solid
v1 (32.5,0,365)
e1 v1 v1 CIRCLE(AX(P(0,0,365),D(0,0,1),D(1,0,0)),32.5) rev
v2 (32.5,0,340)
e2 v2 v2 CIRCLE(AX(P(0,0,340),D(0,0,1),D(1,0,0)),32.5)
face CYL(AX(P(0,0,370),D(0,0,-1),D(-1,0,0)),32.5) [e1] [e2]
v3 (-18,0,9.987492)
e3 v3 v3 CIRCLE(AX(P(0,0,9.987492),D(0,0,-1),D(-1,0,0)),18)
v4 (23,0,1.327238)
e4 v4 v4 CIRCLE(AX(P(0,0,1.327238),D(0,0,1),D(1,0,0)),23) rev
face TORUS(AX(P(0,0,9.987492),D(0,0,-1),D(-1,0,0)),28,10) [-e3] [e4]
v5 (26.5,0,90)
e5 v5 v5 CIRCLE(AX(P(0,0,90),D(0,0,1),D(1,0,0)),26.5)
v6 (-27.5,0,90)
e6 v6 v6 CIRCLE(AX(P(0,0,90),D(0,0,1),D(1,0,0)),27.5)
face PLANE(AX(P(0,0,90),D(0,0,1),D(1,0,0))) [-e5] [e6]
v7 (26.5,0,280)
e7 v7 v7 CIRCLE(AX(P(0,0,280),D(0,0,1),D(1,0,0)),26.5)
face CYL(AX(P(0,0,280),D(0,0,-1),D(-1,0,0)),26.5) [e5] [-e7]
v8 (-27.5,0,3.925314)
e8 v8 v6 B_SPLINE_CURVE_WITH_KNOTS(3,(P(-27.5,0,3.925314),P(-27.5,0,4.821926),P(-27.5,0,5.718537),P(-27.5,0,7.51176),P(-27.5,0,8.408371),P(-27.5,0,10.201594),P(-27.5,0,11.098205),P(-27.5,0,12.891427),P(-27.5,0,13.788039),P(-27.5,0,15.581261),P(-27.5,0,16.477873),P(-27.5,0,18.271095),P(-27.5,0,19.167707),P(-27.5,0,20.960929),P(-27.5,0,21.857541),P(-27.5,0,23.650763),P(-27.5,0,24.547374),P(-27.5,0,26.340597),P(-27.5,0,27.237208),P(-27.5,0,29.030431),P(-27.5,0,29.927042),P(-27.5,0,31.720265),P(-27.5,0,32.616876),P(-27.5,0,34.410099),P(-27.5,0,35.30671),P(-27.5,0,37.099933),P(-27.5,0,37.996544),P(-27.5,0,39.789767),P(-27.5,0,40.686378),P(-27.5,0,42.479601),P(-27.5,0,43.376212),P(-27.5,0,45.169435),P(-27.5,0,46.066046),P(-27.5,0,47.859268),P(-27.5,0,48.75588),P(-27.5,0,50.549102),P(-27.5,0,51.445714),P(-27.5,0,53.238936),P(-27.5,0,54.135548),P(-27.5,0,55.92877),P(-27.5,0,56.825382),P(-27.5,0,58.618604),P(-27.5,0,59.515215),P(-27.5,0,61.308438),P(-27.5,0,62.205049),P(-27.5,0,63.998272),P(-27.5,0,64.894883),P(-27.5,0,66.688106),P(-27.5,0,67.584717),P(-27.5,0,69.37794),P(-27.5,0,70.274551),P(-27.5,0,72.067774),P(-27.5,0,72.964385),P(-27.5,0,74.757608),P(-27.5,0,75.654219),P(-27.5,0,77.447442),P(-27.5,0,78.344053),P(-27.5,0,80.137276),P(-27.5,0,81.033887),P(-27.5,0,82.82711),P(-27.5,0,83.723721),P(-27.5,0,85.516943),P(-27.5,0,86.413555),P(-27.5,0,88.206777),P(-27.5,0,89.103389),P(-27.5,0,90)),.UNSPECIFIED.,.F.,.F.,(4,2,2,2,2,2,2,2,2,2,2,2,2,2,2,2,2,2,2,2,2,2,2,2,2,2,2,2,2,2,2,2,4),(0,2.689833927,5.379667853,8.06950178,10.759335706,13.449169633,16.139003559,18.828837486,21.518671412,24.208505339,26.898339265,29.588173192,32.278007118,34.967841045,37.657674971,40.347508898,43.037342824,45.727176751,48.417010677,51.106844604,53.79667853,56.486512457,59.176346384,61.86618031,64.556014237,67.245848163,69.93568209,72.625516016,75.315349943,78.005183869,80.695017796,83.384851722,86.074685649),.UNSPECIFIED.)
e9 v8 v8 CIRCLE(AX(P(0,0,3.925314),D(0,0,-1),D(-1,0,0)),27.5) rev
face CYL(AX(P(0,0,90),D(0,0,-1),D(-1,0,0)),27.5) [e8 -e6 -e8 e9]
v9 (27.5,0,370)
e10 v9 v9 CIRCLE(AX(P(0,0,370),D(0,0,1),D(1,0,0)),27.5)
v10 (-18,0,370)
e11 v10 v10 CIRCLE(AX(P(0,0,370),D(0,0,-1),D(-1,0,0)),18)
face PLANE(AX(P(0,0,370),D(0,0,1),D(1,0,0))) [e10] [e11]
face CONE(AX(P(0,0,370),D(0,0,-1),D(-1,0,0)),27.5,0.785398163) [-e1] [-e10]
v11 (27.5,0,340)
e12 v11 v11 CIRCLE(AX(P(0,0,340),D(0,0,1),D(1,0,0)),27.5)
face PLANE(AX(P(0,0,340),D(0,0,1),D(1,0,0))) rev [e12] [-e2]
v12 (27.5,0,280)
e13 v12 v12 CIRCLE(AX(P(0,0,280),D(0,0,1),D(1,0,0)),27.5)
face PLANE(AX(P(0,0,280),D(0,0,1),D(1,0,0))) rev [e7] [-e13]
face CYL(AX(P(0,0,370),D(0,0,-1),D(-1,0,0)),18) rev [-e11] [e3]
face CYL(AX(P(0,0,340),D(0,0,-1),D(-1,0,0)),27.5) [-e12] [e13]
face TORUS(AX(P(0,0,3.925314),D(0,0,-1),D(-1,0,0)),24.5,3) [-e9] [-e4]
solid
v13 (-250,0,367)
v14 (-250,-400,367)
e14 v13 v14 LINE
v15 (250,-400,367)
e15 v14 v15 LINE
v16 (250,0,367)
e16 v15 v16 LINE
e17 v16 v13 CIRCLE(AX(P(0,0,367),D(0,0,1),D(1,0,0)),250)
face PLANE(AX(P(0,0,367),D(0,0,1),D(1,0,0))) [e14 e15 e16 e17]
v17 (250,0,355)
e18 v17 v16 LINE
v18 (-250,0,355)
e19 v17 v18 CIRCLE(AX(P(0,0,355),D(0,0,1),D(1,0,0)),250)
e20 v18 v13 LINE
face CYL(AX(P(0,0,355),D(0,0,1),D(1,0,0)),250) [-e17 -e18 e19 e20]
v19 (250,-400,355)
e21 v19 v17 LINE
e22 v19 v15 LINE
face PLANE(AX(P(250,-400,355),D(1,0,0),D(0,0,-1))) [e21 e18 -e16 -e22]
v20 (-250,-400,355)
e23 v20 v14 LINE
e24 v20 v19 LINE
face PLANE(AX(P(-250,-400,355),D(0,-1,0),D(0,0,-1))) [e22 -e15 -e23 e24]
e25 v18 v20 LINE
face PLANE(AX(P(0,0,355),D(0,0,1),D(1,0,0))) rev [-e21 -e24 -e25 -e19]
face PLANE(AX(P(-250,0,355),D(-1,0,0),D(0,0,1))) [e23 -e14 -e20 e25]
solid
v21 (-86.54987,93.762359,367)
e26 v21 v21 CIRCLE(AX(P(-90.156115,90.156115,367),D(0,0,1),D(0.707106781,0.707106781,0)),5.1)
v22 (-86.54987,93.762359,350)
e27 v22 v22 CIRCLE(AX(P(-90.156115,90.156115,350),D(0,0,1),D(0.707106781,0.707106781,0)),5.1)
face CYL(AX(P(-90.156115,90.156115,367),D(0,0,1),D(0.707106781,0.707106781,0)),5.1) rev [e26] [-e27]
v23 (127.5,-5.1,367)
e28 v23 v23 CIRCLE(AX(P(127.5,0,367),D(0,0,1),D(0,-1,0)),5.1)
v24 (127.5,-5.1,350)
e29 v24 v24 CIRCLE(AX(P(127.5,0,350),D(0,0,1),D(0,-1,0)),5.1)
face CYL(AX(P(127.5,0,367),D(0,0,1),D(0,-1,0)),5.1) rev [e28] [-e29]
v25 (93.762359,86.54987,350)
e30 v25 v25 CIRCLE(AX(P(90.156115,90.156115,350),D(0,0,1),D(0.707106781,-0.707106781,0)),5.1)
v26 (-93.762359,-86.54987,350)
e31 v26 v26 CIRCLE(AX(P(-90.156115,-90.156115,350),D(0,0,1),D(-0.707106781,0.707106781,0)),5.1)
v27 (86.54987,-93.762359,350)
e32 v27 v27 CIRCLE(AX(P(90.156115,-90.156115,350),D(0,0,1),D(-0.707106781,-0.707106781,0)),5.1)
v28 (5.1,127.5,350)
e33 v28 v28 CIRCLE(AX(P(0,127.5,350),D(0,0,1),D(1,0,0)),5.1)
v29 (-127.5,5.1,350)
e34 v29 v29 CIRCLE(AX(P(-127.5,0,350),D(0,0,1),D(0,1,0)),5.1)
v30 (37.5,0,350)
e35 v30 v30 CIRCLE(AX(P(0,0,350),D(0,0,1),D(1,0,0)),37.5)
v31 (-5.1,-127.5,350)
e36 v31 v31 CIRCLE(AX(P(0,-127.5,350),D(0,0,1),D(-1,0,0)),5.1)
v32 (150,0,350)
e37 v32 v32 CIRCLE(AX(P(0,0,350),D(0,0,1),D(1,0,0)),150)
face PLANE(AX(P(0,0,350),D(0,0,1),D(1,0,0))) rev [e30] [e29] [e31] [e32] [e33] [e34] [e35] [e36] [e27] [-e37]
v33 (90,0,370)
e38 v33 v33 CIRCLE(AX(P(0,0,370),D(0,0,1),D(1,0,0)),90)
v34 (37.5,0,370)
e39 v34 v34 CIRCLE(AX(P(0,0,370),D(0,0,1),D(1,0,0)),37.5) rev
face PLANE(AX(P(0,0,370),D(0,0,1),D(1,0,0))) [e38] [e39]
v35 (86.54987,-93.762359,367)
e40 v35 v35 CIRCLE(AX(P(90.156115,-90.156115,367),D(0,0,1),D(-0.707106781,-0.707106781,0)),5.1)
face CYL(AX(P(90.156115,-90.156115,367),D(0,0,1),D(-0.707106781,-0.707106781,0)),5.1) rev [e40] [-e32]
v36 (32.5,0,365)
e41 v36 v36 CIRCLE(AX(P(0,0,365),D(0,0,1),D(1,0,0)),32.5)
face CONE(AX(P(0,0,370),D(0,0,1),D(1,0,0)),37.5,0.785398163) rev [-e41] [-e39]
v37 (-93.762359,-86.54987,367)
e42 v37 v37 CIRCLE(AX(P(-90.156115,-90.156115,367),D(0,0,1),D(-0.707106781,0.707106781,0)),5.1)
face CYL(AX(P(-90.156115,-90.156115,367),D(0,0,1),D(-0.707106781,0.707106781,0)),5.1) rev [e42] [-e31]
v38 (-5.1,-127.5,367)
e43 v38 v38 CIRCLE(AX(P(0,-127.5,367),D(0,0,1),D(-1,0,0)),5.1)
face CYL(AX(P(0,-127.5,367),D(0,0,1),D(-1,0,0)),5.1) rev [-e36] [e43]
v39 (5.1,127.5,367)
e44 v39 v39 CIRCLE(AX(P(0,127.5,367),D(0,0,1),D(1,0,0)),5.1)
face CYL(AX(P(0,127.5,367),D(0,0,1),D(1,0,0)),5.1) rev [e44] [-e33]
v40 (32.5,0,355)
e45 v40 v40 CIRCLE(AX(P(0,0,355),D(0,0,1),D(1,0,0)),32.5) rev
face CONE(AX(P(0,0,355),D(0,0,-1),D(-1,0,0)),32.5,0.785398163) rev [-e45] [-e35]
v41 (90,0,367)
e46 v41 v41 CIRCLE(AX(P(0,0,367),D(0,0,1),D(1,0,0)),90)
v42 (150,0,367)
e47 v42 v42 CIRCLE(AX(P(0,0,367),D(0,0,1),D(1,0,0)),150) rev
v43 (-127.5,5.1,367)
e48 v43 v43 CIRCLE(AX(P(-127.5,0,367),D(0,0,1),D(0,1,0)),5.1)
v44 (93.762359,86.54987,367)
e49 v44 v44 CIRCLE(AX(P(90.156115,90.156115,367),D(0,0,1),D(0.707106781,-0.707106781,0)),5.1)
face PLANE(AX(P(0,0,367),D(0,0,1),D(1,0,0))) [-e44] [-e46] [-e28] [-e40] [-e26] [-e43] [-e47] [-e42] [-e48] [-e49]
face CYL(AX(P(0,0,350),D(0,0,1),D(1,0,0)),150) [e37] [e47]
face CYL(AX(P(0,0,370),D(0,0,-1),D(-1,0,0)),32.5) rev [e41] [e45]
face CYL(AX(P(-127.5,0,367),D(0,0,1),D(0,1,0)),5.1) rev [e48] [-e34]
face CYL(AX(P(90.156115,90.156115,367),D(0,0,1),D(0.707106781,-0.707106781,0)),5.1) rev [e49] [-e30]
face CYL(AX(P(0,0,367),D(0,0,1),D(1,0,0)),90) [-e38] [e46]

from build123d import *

# Parameters (mm, degrees)
SKETCH_1_R               = 27.5
EXTRUDE_1_DEPTH          = 90
SKETCH_2_R               = 26.5
EXTRUDE_2_DEPTH          = 190
SKETCH_3_R               = 27.5
EXTRUDE_3_DEPTH          = 60
SKETCH_4_R               = 32.5
EXTRUDE_4_DEPTH          = 30
SKETCH_5_R               = 150.00000000000003
EXTRUDE_5_DEPTH          = 20
SKETCH_6_R               = 32.5
CUT_EXTRUDE_1_DEPTH      = 20
CHAMFER_4_SIZE           = 5
SKETCH_8_OUTSIDE_W       = 414.588
SKETCH_8_OUTSIDE_H       = 414.588
SKETCH_8_OUTSIDE_R       = 90
CUT_EXTRUDE_2_DEPTH      = 3
CHAMFER_5_SIZE           = 5
CHAMFER_6_SIZE           = 5
SKETCH_12_R              = 3.000000000000001
CUT_EXTRUDE_4_DEPTH      = 410.2676385936225
PATTERN_CIRCULAR_1_COUNT = 8
SKETCH_13_R              = 18
CUT_EXTRUDE_5_DEPTH      = 427.49736224272243
FILLET_1_R               = 10
FILLET_2_R               = 3
PATTERN_CIRCULAR_2_COUNT = 8
EXTRUDE_6_DEPTH          = 12


with BuildPart() as part:
    # 草图1 → 凸台-拉伸1 (new body)
    with BuildSketch(Plane.XY):
        with Locations(Location((0, 0, 0), (0, 0, 180))):
            Circle(SKETCH_1_R)
    extrude(amount=EXTRUDE_1_DEPTH)

    # 草图2 → 凸台-拉伸2 (add)
    with BuildSketch(Plane.XY.offset(90)):
        Circle(SKETCH_2_R)
    extrude(amount=EXTRUDE_2_DEPTH)

    # 草图3 → 凸台-拉伸3 (add)
    with BuildSketch(Plane.XY.offset(280)):
        with Locations(Location((0, 0, 0), (0, 0, 180))):
            Circle(SKETCH_3_R)
    extrude(amount=EXTRUDE_3_DEPTH)

    # 草图4 → 凸台-拉伸4 (add)
    with BuildSketch(Plane.XY.offset(340)):
        Circle(SKETCH_4_R)
    extrude(amount=EXTRUDE_4_DEPTH)

    # 倒角5
    chamfer_5_edges = [part.edges().sort_by_distance(p)[0] for p in [
        (-32.5, 3.98e-15, 370),
    ]]
    chamfer(chamfer_5_edges, length=CHAMFER_5_SIZE)

    # 草图9 → M12 螺纹孔1 (revolve, cut)
    with BuildSketch(Plane.YZ):
        Polygon((0, 0), (-7.91e-15, 32.31438915704056), (5.099999999999992, 29.25), (5.099999999999995, -2.3e-16), align=None)
    revolve(axis=Axis((0, 0, -6.349999999999991), (0, 0, 1)), mode=Mode.SUBTRACT)

    # 草图13 → 切除-拉伸5 (cut, through all)
    with BuildSketch(Plane(origin=(0, 0, 0), x_dir=(-1, 0, 0), z_dir=(0, 0, -1))):
        Circle(SKETCH_13_R)
    extrude(amount=-CUT_EXTRUDE_5_DEPTH, mode=Mode.SUBTRACT)

    # 圆角1
    # the kernel refuses this fillet: 10 mm, written as the material it takes off along each edge
    with BuildSketch(Plane(origin=(0, 0, 0), x_dir=(-1, 0, 0), z_dir=(0, -1, 0))) as fillet_1_piece_1:
        with BuildLine():
            CenterArc((28, -9.987492177719089), FILLET_1_R, 92.86598398259886, 87.13401601740111)
            Line((27.5, 0), (27.49, 0.19974984355438177))
            ThreePointArc((27.49, 0.19974984355438177), (22.75, 0.2), (18, 0.2))
            Line((18, 0.2), (17.8, 0))
            Line((17.8, 0), (17.8, -9.987492177719089))
            Line((17.8, -9.987492177719089), (18, -9.987492177719089))
        make_face()
    revolve(axis=Axis((0, 0, 0), (0, 0, -1)), mode=Mode.SUBTRACT)

    # 圆角2
    fillet_2_edges = [part.edges().sort_by_distance(p)[0] for p in [
        (27.5, -6.74e-15, 0),
    ]]
    fillet(fillet_2_edges, radius=FILLET_2_R)


with BuildPart() as body_2:
    # 草图5 → 凸台-拉伸5 (new body)
    with BuildSketch(Plane.XY.offset(370)):
        Circle(SKETCH_5_R)
    extrude(amount=-EXTRUDE_5_DEPTH)

    # 草图6 → 切除-拉伸1 (cut)
    with BuildSketch(Plane(origin=(0, 0, 350), x_dir=(-1, 0, 0), z_dir=(0, 0, -1))):
        Circle(SKETCH_6_R)
    extrude(amount=-CUT_EXTRUDE_1_DEPTH, mode=Mode.SUBTRACT)

    # 倒角4
    chamfer_4_edges = [body_2.edges().sort_by_distance(p)[0] for p in [
        (32.5, 3.98e-15, 350),
    ]]
    chamfer(chamfer_4_edges, length=CHAMFER_4_SIZE)

    # 草图8 outside → 切除-拉伸2 (cut)
    with BuildSketch(Plane.XY.offset(370)):
        Rectangle(SKETCH_8_OUTSIDE_W, SKETCH_8_OUTSIDE_H)
        Circle(SKETCH_8_OUTSIDE_R, mode=Mode.SUBTRACT)
    extrude(amount=-CUT_EXTRUDE_2_DEPTH, mode=Mode.SUBTRACT)

    # 倒角6
    chamfer_6_edges = [body_2.edges().sort_by_distance(p)[0] for p in [
        (32.5, 3.98e-15, 370),
    ]]
    chamfer(chamfer_6_edges, length=CHAMFER_6_SIZE)

    # 草图12 → 切除-拉伸4 (cut, through all)
    with BuildSketch(Plane(origin=(0, 0, 350), x_dir=(-1, 0, 0), z_dir=(0, 0, -1))):
        with Locations((7.91e-15, 127.5)):
            Circle(SKETCH_12_R)
    cut_extrude_4 = extrude(amount=-CUT_EXTRUDE_4_DEPTH, mode=Mode.SUBTRACT)

    # 阵列(圆周)1: 切除-拉伸4 ×8 about axis
    pattern_circular_1_axis = Axis((1.1129e-13, 0, 0), (0, 0, 1))
    for i in range(1, PATTERN_CIRCULAR_1_COUNT):
        add(cut_extrude_4.rotate(pattern_circular_1_axis, i * 360 / PATTERN_CIRCULAR_1_COUNT), mode=Mode.SUBTRACT)

    # 草图15 → M12 螺纹孔2 (revolve, cut)
    with BuildSketch(Plane(origin=(-7.91e-15, 127.5, 367), x_dir=(0, -1, 0), z_dir=(1, 0, 0))):
        Polygon((0, 0), (-7.91e-15, 32.314389157040544), (5.0999999999999845, 29.25), (5.099999999999987, -9.3e-16), align=None)
    hole_wizard_m12_2 = revolve(axis=Axis((-7.91e-15, 127.5, 373.34999999999997), (0, 0, -1)), mode=Mode.SUBTRACT)

    # 阵列(圆周)2: M12 螺纹孔2 ×8 about axis
    pattern_circular_2_axis = Axis((-1.1129e-13, 0, 0), (0, 0, 1))
    for i in range(1, PATTERN_CIRCULAR_2_COUNT):
        add(hole_wizard_m12_2.rotate(pattern_circular_2_axis, i * 360 / PATTERN_CIRCULAR_2_COUNT), mode=Mode.SUBTRACT)


with BuildPart() as body_3:
    # 草图17 → 凸台-拉伸6 (new body)
    with BuildSketch(Plane.XY.offset(367)):
        with BuildLine():
            Line((-250, 0), (-250, -400))
            Line((-250, -400), (250, -400))
            Line((250, -400), (250, 0))
            ThreePointArc((250, 0), (1.531e-14, 250), (-250, 0))
        make_face()
    extrude(amount=-EXTRUDE_6_DEPTH)


solid = Compound([part.part, body_2.part, body_3.part])
